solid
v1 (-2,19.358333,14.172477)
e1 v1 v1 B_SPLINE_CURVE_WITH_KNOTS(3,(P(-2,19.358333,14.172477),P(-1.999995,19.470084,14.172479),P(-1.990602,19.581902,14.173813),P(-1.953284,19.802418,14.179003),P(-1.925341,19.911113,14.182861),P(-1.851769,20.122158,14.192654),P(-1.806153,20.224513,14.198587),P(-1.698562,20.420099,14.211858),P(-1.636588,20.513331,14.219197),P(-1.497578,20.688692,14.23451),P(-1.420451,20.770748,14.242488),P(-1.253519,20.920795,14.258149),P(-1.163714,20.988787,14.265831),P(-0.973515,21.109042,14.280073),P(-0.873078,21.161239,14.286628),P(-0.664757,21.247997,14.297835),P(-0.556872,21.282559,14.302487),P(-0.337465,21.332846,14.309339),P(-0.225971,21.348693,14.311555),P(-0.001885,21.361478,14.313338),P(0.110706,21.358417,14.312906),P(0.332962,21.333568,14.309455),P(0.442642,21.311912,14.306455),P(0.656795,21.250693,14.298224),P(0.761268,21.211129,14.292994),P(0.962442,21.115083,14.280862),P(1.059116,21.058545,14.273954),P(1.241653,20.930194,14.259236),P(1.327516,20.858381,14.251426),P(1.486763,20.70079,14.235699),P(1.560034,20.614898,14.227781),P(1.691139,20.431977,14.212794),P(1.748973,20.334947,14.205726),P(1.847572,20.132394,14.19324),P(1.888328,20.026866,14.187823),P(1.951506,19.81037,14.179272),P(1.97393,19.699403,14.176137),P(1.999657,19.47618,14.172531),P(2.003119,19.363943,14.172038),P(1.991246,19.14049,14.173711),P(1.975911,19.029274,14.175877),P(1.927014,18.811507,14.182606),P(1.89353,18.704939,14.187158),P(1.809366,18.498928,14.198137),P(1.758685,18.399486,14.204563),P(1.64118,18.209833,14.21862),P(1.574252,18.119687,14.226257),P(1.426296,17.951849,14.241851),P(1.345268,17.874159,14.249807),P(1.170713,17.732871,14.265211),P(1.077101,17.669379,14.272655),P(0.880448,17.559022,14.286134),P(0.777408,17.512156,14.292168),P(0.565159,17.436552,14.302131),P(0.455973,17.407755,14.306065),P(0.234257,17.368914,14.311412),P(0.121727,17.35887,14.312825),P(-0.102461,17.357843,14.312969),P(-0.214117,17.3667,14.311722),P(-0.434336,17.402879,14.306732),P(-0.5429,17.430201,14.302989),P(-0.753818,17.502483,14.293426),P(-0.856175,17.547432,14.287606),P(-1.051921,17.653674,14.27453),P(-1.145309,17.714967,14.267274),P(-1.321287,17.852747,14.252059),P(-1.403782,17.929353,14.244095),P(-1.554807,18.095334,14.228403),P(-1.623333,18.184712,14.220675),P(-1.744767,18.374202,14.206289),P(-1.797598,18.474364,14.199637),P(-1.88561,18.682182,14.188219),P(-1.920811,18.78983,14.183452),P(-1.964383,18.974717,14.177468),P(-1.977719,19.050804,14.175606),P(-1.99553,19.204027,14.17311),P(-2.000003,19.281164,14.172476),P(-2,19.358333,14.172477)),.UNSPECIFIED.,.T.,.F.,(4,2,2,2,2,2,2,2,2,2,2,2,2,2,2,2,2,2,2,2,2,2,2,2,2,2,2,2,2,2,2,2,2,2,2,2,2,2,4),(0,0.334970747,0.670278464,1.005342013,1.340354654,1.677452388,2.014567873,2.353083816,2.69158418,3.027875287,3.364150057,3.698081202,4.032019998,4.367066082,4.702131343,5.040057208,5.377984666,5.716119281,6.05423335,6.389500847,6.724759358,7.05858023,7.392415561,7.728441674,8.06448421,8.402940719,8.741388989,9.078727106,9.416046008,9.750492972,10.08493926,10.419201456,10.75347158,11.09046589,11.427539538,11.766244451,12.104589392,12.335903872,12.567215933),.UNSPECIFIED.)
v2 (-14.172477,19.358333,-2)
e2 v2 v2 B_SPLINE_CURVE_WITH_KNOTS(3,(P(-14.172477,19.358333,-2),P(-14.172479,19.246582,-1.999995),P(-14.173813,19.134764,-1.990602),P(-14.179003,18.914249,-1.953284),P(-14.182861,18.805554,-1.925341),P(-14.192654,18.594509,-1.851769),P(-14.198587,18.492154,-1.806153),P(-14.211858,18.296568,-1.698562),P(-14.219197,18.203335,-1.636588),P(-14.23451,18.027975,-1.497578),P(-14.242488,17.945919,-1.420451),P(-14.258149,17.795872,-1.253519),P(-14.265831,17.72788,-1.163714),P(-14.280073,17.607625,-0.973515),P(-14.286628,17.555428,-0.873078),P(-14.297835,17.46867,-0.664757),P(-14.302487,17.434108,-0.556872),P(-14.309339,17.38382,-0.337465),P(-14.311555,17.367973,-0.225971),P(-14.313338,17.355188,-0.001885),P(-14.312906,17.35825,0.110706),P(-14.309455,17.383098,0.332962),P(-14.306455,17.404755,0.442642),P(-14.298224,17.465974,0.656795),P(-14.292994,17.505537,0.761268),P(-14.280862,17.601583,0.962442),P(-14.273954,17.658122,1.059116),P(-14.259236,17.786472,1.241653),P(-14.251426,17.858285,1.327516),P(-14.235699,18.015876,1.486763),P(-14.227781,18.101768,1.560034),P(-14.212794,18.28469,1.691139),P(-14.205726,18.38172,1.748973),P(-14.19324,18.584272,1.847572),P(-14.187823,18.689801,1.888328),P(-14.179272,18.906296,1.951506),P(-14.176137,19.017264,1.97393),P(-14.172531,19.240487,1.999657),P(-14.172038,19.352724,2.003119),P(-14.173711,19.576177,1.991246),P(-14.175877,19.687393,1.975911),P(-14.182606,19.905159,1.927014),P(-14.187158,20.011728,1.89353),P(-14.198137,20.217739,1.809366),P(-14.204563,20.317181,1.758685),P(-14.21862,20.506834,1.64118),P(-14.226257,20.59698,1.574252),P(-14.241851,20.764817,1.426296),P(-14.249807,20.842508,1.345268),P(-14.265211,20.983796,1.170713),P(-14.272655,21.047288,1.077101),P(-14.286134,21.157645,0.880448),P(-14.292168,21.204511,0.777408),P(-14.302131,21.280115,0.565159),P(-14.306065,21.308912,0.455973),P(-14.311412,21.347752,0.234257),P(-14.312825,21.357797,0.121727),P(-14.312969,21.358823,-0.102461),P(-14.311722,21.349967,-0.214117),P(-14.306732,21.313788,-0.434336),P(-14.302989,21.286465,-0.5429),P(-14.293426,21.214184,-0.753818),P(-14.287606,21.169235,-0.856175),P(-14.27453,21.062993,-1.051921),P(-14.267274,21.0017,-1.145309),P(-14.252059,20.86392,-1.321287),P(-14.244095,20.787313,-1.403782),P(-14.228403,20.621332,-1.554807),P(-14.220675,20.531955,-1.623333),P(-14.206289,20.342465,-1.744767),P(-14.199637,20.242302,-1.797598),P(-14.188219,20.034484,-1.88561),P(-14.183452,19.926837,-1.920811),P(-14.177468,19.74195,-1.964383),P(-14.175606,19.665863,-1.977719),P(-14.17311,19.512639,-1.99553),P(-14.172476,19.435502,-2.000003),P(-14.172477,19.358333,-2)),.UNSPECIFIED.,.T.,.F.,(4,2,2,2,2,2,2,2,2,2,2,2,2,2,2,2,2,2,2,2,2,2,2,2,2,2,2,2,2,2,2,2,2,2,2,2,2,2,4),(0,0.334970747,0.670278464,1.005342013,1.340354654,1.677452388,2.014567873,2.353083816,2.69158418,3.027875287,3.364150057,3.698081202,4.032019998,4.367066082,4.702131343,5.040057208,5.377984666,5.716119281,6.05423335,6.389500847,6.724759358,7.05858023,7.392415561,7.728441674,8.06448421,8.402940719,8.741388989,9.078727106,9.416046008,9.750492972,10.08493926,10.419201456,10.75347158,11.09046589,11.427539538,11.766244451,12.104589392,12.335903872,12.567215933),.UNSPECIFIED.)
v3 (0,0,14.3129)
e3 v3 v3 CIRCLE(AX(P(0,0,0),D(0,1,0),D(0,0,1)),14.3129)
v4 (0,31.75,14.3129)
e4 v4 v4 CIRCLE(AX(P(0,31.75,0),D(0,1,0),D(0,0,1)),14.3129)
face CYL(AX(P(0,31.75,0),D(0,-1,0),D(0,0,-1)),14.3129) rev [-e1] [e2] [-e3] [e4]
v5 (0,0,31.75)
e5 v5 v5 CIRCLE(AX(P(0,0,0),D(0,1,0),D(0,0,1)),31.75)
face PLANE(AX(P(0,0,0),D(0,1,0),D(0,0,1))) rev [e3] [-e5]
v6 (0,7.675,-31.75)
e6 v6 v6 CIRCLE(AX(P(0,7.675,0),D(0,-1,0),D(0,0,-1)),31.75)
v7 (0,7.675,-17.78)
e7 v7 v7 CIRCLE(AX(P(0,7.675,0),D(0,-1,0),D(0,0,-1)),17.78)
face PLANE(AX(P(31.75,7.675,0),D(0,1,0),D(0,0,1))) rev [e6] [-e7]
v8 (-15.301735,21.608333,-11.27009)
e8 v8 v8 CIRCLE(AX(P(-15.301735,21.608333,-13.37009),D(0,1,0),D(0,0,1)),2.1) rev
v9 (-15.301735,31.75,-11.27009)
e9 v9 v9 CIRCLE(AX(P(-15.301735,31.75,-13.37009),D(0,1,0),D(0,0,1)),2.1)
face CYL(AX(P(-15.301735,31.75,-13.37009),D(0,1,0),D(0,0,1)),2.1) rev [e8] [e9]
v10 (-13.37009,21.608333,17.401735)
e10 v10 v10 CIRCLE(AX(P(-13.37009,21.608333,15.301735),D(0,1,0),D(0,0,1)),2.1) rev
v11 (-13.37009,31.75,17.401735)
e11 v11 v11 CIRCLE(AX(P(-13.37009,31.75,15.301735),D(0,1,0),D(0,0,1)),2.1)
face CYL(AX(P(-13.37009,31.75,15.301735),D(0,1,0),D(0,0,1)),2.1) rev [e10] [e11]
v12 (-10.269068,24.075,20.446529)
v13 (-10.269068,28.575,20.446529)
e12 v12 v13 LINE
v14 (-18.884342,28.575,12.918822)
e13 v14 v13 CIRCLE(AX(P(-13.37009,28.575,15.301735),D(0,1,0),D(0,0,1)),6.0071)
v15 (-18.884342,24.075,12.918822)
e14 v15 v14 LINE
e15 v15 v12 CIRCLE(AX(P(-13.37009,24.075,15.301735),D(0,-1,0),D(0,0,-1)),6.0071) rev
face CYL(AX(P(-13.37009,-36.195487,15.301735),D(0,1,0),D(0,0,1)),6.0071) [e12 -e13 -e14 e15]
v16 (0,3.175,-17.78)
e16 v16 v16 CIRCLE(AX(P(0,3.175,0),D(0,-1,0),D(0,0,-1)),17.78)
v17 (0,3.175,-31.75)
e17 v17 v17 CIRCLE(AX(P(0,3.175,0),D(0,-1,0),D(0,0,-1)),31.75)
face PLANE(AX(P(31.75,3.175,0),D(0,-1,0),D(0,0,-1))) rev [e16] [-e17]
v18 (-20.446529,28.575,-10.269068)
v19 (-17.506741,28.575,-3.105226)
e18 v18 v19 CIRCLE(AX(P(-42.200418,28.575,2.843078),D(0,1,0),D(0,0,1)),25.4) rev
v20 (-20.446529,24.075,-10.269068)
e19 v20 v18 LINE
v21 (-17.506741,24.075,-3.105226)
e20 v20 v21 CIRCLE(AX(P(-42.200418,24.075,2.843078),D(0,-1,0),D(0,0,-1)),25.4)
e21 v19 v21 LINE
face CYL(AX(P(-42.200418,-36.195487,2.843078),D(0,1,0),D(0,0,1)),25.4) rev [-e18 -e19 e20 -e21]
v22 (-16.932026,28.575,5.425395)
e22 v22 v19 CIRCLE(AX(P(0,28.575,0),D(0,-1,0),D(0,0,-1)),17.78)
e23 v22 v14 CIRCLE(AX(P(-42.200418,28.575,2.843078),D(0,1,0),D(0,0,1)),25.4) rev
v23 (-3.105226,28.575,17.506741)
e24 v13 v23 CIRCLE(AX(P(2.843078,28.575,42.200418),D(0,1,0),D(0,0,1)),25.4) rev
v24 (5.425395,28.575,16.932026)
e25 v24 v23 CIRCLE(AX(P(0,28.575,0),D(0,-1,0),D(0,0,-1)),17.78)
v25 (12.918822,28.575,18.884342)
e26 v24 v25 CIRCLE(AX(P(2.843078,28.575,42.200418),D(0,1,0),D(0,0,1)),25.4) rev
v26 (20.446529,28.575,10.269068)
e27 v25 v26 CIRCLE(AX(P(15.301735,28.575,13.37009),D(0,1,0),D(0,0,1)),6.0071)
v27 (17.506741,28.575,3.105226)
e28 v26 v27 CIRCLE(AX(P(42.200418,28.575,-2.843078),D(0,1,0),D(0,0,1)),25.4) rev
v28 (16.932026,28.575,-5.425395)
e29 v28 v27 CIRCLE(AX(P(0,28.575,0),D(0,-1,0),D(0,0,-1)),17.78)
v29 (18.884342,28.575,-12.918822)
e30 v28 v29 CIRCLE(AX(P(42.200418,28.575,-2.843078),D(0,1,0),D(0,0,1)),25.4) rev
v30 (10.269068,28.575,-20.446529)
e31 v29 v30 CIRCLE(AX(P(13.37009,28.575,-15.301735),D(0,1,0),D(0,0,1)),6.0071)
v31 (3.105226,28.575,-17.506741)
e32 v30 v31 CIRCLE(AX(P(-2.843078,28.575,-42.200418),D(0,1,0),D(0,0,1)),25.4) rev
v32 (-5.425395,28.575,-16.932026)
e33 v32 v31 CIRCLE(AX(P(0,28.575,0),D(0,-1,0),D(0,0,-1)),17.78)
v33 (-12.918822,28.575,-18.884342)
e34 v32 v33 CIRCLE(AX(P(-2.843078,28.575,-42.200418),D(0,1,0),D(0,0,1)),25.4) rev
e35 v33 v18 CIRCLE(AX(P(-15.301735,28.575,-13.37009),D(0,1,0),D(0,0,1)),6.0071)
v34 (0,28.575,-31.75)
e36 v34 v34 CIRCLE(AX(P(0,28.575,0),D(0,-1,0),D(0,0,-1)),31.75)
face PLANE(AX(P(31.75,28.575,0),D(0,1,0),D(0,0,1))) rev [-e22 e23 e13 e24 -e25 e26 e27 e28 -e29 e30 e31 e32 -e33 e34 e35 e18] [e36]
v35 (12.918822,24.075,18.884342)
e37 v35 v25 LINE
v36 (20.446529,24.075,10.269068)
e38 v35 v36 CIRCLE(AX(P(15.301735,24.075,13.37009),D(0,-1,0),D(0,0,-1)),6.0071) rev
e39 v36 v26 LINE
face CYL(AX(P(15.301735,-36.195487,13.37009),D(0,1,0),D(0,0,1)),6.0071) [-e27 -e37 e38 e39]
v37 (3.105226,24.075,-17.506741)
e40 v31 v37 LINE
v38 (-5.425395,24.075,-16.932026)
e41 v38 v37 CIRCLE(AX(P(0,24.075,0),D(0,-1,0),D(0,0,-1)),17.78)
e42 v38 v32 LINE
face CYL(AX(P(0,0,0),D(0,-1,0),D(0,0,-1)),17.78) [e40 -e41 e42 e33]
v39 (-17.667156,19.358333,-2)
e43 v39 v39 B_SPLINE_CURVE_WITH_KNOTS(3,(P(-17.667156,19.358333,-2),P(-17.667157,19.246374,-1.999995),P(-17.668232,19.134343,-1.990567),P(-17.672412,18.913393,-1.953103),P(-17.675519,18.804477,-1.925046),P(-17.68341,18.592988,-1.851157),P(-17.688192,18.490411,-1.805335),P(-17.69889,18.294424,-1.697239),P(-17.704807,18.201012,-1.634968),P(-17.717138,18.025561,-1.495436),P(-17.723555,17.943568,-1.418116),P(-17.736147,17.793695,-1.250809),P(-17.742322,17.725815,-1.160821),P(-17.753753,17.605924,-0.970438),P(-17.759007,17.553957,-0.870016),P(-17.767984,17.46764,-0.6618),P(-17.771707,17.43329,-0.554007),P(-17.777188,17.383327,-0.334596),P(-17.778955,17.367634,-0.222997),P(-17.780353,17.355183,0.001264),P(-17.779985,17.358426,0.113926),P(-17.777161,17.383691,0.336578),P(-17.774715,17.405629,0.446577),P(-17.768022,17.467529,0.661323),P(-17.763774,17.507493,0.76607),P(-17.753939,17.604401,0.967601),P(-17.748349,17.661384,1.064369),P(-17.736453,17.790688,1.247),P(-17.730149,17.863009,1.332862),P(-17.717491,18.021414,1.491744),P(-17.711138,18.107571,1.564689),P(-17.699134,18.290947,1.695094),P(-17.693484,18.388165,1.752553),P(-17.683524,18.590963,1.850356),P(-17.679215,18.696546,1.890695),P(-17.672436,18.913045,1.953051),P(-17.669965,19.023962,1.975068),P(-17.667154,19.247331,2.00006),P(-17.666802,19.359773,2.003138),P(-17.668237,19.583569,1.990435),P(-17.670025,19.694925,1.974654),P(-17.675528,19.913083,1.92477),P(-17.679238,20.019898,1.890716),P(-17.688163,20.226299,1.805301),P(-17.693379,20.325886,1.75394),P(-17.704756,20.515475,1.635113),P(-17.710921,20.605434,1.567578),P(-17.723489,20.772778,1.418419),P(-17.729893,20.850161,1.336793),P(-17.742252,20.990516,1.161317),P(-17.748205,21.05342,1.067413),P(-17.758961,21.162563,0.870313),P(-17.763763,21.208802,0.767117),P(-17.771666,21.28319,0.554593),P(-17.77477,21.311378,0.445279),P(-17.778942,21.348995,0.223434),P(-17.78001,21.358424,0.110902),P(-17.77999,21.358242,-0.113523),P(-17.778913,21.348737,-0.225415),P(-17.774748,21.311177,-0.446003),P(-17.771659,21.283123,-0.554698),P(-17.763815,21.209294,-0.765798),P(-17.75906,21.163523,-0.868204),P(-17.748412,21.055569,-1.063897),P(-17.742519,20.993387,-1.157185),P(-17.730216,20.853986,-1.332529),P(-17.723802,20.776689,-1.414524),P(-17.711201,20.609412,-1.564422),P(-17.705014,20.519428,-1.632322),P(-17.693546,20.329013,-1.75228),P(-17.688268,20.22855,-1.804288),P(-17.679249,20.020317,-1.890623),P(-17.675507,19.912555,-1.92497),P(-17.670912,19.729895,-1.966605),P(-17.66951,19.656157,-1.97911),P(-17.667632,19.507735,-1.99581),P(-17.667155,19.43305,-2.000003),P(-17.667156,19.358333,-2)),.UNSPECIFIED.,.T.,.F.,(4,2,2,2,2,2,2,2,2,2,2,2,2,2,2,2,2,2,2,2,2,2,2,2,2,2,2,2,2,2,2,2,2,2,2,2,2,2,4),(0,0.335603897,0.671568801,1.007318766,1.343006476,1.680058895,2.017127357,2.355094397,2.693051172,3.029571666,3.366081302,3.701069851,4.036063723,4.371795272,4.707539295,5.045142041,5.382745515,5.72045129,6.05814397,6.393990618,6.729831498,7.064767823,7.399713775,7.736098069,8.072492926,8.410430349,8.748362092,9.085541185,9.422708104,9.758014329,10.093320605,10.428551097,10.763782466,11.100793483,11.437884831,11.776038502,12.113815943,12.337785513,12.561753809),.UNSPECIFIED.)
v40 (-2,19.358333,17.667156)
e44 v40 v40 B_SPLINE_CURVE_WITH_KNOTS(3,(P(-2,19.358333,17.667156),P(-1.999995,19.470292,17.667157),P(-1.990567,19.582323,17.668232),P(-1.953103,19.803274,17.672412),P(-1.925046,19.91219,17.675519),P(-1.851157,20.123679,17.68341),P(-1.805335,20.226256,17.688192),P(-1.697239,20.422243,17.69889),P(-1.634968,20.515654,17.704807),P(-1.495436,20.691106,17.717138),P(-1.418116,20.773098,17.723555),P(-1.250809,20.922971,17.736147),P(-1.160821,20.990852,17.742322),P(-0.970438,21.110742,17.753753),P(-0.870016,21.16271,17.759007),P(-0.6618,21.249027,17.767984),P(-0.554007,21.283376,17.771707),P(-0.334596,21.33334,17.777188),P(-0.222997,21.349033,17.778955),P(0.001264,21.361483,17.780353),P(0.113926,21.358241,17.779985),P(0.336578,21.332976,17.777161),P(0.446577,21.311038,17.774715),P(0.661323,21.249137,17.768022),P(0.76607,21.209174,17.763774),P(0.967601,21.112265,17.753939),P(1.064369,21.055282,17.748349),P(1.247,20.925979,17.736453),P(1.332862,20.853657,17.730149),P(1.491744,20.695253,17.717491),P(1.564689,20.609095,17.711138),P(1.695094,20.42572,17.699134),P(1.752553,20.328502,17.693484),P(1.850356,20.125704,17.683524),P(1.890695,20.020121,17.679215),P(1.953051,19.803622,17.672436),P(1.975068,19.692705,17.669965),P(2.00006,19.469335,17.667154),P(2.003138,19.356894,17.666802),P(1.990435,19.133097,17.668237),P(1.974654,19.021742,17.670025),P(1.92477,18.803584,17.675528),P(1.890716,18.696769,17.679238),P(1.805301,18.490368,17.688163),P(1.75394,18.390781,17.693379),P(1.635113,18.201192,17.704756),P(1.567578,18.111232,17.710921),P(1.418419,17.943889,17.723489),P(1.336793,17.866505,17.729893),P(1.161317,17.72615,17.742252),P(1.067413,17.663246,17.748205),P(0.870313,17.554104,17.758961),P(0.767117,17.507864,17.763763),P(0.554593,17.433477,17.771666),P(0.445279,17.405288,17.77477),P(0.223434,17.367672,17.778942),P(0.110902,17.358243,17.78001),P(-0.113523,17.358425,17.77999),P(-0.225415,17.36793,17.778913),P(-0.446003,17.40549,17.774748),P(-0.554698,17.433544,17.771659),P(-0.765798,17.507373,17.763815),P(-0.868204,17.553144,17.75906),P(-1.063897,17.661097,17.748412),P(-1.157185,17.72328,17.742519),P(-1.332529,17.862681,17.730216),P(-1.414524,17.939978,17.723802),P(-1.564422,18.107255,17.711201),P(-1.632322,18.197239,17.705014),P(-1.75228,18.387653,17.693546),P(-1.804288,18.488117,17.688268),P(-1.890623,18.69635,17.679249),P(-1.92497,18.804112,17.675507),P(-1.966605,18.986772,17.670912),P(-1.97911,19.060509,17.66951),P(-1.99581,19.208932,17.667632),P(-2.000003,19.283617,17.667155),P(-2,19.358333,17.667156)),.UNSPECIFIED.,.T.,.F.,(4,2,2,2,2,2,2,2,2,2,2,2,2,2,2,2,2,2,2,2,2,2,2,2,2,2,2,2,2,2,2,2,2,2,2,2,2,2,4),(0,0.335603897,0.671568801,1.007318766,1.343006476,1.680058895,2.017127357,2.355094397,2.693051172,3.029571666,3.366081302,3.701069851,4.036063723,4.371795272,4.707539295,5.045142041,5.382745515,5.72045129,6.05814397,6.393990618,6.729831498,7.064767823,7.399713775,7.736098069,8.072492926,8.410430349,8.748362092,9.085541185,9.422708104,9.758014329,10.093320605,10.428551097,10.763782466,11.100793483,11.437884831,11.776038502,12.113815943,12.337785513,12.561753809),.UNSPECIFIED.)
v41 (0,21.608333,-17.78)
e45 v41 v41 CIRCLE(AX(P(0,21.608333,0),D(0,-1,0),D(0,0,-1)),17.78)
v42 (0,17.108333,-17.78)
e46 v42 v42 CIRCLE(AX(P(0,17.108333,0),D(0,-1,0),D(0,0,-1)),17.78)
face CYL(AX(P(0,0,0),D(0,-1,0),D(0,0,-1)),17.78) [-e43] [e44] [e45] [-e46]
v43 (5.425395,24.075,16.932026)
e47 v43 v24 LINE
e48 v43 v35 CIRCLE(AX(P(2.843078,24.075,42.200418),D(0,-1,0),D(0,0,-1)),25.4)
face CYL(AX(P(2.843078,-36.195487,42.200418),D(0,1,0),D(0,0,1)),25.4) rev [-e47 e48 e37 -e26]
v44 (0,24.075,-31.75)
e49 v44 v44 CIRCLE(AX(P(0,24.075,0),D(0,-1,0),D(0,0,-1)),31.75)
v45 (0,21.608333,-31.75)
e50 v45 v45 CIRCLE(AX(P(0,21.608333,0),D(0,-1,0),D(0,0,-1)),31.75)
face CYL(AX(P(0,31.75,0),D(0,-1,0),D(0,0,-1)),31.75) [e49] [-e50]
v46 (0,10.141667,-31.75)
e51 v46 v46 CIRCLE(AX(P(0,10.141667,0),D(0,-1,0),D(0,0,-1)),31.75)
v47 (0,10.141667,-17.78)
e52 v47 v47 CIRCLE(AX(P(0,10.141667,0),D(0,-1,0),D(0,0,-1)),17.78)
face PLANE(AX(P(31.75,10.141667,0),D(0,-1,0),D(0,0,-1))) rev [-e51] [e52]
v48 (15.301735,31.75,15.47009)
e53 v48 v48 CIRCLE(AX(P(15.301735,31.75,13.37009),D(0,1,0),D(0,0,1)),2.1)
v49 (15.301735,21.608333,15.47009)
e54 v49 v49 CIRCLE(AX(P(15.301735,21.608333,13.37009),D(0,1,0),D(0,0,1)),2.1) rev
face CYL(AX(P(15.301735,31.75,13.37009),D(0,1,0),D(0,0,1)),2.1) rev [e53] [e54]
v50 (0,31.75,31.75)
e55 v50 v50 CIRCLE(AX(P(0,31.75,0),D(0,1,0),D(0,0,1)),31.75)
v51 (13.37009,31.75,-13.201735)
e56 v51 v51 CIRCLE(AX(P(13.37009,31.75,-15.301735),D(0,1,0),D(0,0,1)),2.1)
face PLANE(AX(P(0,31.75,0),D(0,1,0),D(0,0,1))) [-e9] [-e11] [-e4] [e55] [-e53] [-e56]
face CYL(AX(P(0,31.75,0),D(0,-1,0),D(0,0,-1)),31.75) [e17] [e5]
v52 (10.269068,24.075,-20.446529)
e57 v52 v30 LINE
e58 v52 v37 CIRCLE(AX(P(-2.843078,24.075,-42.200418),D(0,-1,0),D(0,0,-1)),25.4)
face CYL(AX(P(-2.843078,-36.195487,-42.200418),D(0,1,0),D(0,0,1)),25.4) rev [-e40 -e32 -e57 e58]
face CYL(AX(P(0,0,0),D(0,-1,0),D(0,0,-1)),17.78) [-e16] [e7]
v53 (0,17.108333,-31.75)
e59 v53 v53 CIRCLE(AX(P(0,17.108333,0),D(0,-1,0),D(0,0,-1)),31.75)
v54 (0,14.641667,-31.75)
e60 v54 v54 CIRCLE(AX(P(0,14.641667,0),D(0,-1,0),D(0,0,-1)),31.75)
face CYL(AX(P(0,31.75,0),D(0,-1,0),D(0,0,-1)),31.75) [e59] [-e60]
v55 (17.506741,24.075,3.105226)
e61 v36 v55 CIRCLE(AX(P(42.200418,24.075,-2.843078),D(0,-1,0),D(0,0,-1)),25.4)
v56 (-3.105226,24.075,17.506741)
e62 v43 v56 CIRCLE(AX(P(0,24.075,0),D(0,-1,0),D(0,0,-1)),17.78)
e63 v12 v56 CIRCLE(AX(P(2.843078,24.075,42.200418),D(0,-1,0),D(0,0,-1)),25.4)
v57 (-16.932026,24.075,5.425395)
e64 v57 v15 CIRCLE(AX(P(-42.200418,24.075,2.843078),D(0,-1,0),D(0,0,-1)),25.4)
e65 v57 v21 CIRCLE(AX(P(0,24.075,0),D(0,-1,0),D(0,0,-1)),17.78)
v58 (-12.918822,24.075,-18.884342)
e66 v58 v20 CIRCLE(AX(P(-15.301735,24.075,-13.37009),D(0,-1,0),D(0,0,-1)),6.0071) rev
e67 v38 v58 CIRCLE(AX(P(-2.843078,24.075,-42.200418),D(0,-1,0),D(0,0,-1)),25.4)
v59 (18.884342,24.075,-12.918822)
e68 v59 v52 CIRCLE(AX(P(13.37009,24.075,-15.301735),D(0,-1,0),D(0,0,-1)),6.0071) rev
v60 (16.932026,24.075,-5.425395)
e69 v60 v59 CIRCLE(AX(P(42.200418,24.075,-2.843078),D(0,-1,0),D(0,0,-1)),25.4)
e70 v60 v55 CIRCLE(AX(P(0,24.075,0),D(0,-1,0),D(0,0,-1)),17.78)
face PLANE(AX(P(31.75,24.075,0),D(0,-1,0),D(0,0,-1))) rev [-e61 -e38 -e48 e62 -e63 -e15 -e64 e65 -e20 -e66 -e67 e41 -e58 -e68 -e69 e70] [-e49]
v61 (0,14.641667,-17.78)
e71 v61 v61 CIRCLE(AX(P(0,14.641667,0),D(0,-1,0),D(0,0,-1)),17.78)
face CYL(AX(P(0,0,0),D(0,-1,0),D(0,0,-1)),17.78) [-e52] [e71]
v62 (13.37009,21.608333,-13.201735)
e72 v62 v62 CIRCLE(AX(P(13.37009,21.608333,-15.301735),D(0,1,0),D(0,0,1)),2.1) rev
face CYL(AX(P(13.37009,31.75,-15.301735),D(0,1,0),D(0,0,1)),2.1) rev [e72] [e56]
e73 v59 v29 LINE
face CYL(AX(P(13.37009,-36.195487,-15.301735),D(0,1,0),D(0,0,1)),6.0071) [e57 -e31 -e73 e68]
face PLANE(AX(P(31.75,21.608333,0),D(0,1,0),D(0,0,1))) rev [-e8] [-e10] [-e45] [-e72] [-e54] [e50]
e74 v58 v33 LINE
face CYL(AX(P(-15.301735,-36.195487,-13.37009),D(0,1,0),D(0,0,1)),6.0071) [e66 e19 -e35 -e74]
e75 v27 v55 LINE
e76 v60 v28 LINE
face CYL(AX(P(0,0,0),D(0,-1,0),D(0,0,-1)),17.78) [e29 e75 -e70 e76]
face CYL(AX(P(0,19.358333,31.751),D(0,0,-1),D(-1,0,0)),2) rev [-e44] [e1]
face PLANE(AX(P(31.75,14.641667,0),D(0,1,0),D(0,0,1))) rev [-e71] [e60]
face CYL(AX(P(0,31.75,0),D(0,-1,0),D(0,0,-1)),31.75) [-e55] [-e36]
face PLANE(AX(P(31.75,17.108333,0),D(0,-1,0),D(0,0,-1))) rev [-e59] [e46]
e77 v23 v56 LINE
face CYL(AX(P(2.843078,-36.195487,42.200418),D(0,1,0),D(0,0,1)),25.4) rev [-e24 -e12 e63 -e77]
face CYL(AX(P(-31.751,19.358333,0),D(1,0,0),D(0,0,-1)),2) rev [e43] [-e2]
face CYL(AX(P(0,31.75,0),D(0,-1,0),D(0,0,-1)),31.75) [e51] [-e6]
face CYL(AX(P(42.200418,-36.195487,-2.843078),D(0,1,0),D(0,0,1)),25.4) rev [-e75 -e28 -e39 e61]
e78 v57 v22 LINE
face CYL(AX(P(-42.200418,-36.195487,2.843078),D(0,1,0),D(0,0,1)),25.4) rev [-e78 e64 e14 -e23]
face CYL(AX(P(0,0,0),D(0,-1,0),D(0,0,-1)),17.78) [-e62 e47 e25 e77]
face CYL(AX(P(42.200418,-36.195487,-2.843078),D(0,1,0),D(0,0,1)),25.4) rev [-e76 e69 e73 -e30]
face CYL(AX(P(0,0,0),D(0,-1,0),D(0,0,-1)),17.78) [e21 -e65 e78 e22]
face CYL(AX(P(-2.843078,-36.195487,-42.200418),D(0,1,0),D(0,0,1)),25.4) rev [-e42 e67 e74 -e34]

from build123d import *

# Parameters (mm, degrees)
SKETCH1_R                        = 31.75
SKETCH1_R_2                      = 14.3129
BOSS_EXTRUDE1_DEPTH              = 31.75
SKETCH2_W                        = 13.97
SKETCH2_H                        = 4.5
BOSS_EXTRUDE2_START              = -7.675
BOSS_EXTRUDE2_DEPTH              = 4.5
CUT_EXTRUDE2_REACH               = 56.993
CUT_EXTRUDE2_END_RADIUS          = 17.78
SKETCH8_R                        = 2
CUT_EXTRUDE3_REACH               = 56.993
CUT_EXTRUDE3_END_RADIUS          = 17.78
SKETCH9_R                        = 2
SKETCH10_R                       = 1
CUT_EXTRUDE4_DEPTH               = 10.141666667
TAP_DRILL_FOR_M5X0_8_TAP1_REACH  = 74.51
TAP_DRILL_FOR_M5X0_8_TAP1_BORE_R = 2.1


# Read off the part's stored shape, not the designer's step: Boss-Extrude2
with BuildPart() as part:
    # Sketch1 → Boss-Extrude1 (new body)
    with BuildSketch(Plane(origin=(0, 0, 0), x_dir=(1, 0, 0), z_dir=(0, 1, 0))):
        with Locations(Location((0, 0, 0), (0, 0, 270))):
            Circle(SKETCH1_R)
        with Locations(Location((0, 0, 0), (0, 0, 270))):
            Circle(SKETCH1_R_2, mode=Mode.SUBTRACT)
    extrude(amount=BOSS_EXTRUDE1_DEPTH)

    # Sketch2 → Cut-Revolve2 (revolve, cut)
    with BuildSketch(Plane.XY, mode=Mode.PRIVATE) as cut_revolve2_sk:
        with Locations((24.765, 26.325)):
            Rectangle(SKETCH2_W, SKETCH2_H)
        with Locations((24.765, 12.391666667)):
            Rectangle(SKETCH2_W, SKETCH2_H)
        with Locations((24.765, 5.425)):
            Rectangle(SKETCH2_W, SKETCH2_H)
        with Locations((24.765, 19.358333333)):
            Rectangle(SKETCH2_W, SKETCH2_H)
    revolve(cut_revolve2_sk.sketch.rotate(Axis((0, 0, 0), (0, 1, 0)), 90), axis=Axis((0, 0, 0), (0, 1, 0)), mode=Mode.SUBTRACT)

    # Boss-Extrude2 outline → Boss-Extrude2 (add)
    with BuildSketch(Plane(origin=(0, 31.75, 0), x_dir=(1, 0, 0), z_dir=(0, 1, 0)).offset(BOSS_EXTRUDE2_START)):
        with BuildLine():
            ThreePointArc((-10.269067687, -20.446529483), (-6.799835435, -18.70202978), (-3.105226449, -17.506740665))
            ThreePointArc((-3.105226449, -17.506740665), (-11.698828781, -13.38901808), (-16.932025536, -5.425395031))
            ThreePointArc((-16.932025536, -5.425395031), (-17.620944734, -9.246944713), (-18.884341927, -12.918821503))
            ThreePointArc((-18.884341927, -12.918821503), (-17.322622903, -19.825310342), (-10.269067687, -20.446529483))
        make_face()
        with BuildLine():
            ThreePointArc((17.506740665, -3.105226449), (13.38901808, -11.698828781), (5.425395031, -16.932025536))
            ThreePointArc((5.425395031, -16.932025536), (9.246944713, -17.620944734), (12.918821503, -18.884341927))
            ThreePointArc((12.918821503, -18.884341927), (19.825310342, -17.322622903), (20.446529483, -10.269067687))
            ThreePointArc((20.446529483, -10.269067687), (18.70202978, -6.799835435), (17.506740665, -3.105226449))
        make_face()
        with BuildLine():
            ThreePointArc((-20.446529483, 10.269067687), (-18.70202978, 6.799835435), (-17.506740665, 3.105226449))
            ThreePointArc((-17.506740665, 3.105226449), (-13.38901808, 11.698828781), (-5.425395031, 16.932025536))
            ThreePointArc((-5.425395031, 16.932025536), (-9.246944713, 17.620944734), (-12.918821503, 18.884341927))
            ThreePointArc((-12.918821503, 18.884341927), (-19.825310342, 17.322622903), (-20.446529483, 10.269067687))
        make_face()
        with BuildLine():
            ThreePointArc((10.269067687, 20.446529483), (6.799835435, 18.70202978), (3.105226449, 17.506740665))
            ThreePointArc((3.105226449, 17.506740665), (11.698828781, 13.38901808), (16.932025536, 5.425395031))
            ThreePointArc((16.932025536, 5.425395031), (17.620944734, 9.246944713), (18.884341927, 12.918821503))
            ThreePointArc((18.884341927, 12.918821503), (17.322622903, 19.825310342), (10.269067687, 20.446529483))
        make_face()
    extrude(amount=BOSS_EXTRUDE2_DEPTH)

    # Cut-Extrude2: up to this cylinder (the profile starts inside it)
    cut_extrude2_end = Plane(origin=(0, 19.358333, 0), z_dir=(0, -1, 0)) * Cylinder(CUT_EXTRUDE2_END_RADIUS, 150.546, mode=Mode.PRIVATE)
    # Sketch8 → Cut-Extrude2 (cut, up to the surface)
    with BuildSketch(Plane.XY, mode=Mode.PRIVATE) as cut_extrude2_sk1:
        with Locations(Location((0, 19.358333333, 0), (0, 0, 180))):
            Circle(SKETCH8_R)
    cut_extrude2_tool1 = extrude(cut_extrude2_sk1.sketch, amount=CUT_EXTRUDE2_REACH, mode=Mode.PRIVATE) & cut_extrude2_end
    add(cut_extrude2_tool1.solids().sort_by_distance((0, 19.358333, 0))[0], mode=Mode.SUBTRACT)

    # Cut-Extrude3: up to this cylinder (the profile starts inside it)
    cut_extrude3_end = Plane(origin=(0, 19.358333, 0), z_dir=(0, -1, 0)) * Cylinder(CUT_EXTRUDE3_END_RADIUS, 150.546, mode=Mode.PRIVATE)
    # Sketch9 → Cut-Extrude3 (cut, up to the surface)
    with BuildSketch(Plane(origin=(0, 0, 0), x_dir=(0, 0, -1), z_dir=(1, 0, 0)), mode=Mode.PRIVATE) as cut_extrude3_sk1:
        with Locations((0, 19.358333333)):
            Circle(SKETCH9_R)
    cut_extrude3_tool1 = extrude(cut_extrude3_sk1.sketch, amount=-CUT_EXTRUDE3_REACH, mode=Mode.PRIVATE) & cut_extrude3_end
    add(cut_extrude3_tool1.solids().sort_by_distance((0, 19.358333, 0))[0], mode=Mode.SUBTRACT)

    # Sketch10 → Cut-Extrude4 (cut)
    with BuildSketch(Plane(origin=(0, 31.75, 0), x_dir=(1, 0, 0), z_dir=(0, 1, 0))):
        with Locations(Location((15.301734948, -13.370090036, 0), (0, 0, 270))):
            Circle(SKETCH10_R)
        with Locations(Location((13.370090036, 15.301734948, 0), (0, 0, 270))):
            Circle(SKETCH10_R)
        with Locations(Location((-15.301734948, 13.370090036, 0), (0, 0, 270))):
            Circle(SKETCH10_R)
        with Locations(Location((-13.370090036, -15.301734948, 0), (0, 0, 270))):
            Circle(SKETCH10_R)
    extrude(amount=-CUT_EXTRUDE4_DEPTH, mode=Mode.SUBTRACT)

    # Tap Drill for M5x0.8 Tap1 bore (on position points) → Tap Drill for M5x0.8 Tap1 (cut, up to next)
    with BuildSketch(Plane(origin=(15.301734948, 31.75, 13.370090036), x_dir=(0, 0, 1), z_dir=(0, 1, 0)), mode=Mode.PRIVATE) as tap_drill_for_m5x0_8_tap1_sk1:
        Circle(TAP_DRILL_FOR_M5X0_8_TAP1_BORE_R)
    tap_drill_for_m5x0_8_tap1_tool1 = extrude(tap_drill_for_m5x0_8_tap1_sk1.sketch, amount=-TAP_DRILL_FOR_M5X0_8_TAP1_REACH, mode=Mode.PRIVATE) & part.part
    # Tap Drill for M5x0.8 Tap1 bore (on position points) → Tap Drill for M5x0.8 Tap1 (cut, up to next)
    with BuildSketch(Plane(origin=(15.301734948, 31.75, 13.370090036), x_dir=(0, 0, 1), z_dir=(0, 1, 0)), mode=Mode.PRIVATE) as tap_drill_for_m5x0_8_tap1_sk2:
        with Locations((1.931644912, -28.671824984)):
            Circle(TAP_DRILL_FOR_M5X0_8_TAP1_BORE_R)
    tap_drill_for_m5x0_8_tap1_tool2 = extrude(tap_drill_for_m5x0_8_tap1_sk2.sketch, amount=-TAP_DRILL_FOR_M5X0_8_TAP1_REACH, mode=Mode.PRIVATE) & part.part
    # Tap Drill for M5x0.8 Tap1 bore (on position points) → Tap Drill for M5x0.8 Tap1 (cut, up to next)
    with BuildSketch(Plane(origin=(15.301734948, 31.75, 13.370090036), x_dir=(0, 0, 1), z_dir=(0, 1, 0)), mode=Mode.PRIVATE) as tap_drill_for_m5x0_8_tap1_sk3:
        with Locations((-26.740180072, -30.603469896)):
            Circle(TAP_DRILL_FOR_M5X0_8_TAP1_BORE_R)
    tap_drill_for_m5x0_8_tap1_tool3 = extrude(tap_drill_for_m5x0_8_tap1_sk3.sketch, amount=-TAP_DRILL_FOR_M5X0_8_TAP1_REACH, mode=Mode.PRIVATE) & part.part
    # Tap Drill for M5x0.8 Tap1 bore (on position points) → Tap Drill for M5x0.8 Tap1 (cut, up to next)
    with BuildSketch(Plane(origin=(15.301734948, 31.75, 13.370090036), x_dir=(0, 0, 1), z_dir=(0, 1, 0)), mode=Mode.PRIVATE) as tap_drill_for_m5x0_8_tap1_sk4:
        with Locations((-28.671824984, -1.931644912)):
            Circle(TAP_DRILL_FOR_M5X0_8_TAP1_BORE_R)
    tap_drill_for_m5x0_8_tap1_tool4 = extrude(tap_drill_for_m5x0_8_tap1_sk4.sketch, amount=-TAP_DRILL_FOR_M5X0_8_TAP1_REACH, mode=Mode.PRIVATE) & part.part
    add(tap_drill_for_m5x0_8_tap1_tool1.solids().sort_by_distance((15.301735, 31.75, 13.37009))[0], mode=Mode.SUBTRACT)
    add(tap_drill_for_m5x0_8_tap1_tool2.solids().sort_by_distance((-13.37009, 31.75, 15.301735))[0], mode=Mode.SUBTRACT)
    add(tap_drill_for_m5x0_8_tap1_tool3.solids().sort_by_distance((-15.301735, 31.75, -13.37009))[0], mode=Mode.SUBTRACT)
    add(tap_drill_for_m5x0_8_tap1_tool4.solids().sort_by_distance((13.37009, 31.75, -15.301735))[0], mode=Mode.SUBTRACT)


solid = part.part
